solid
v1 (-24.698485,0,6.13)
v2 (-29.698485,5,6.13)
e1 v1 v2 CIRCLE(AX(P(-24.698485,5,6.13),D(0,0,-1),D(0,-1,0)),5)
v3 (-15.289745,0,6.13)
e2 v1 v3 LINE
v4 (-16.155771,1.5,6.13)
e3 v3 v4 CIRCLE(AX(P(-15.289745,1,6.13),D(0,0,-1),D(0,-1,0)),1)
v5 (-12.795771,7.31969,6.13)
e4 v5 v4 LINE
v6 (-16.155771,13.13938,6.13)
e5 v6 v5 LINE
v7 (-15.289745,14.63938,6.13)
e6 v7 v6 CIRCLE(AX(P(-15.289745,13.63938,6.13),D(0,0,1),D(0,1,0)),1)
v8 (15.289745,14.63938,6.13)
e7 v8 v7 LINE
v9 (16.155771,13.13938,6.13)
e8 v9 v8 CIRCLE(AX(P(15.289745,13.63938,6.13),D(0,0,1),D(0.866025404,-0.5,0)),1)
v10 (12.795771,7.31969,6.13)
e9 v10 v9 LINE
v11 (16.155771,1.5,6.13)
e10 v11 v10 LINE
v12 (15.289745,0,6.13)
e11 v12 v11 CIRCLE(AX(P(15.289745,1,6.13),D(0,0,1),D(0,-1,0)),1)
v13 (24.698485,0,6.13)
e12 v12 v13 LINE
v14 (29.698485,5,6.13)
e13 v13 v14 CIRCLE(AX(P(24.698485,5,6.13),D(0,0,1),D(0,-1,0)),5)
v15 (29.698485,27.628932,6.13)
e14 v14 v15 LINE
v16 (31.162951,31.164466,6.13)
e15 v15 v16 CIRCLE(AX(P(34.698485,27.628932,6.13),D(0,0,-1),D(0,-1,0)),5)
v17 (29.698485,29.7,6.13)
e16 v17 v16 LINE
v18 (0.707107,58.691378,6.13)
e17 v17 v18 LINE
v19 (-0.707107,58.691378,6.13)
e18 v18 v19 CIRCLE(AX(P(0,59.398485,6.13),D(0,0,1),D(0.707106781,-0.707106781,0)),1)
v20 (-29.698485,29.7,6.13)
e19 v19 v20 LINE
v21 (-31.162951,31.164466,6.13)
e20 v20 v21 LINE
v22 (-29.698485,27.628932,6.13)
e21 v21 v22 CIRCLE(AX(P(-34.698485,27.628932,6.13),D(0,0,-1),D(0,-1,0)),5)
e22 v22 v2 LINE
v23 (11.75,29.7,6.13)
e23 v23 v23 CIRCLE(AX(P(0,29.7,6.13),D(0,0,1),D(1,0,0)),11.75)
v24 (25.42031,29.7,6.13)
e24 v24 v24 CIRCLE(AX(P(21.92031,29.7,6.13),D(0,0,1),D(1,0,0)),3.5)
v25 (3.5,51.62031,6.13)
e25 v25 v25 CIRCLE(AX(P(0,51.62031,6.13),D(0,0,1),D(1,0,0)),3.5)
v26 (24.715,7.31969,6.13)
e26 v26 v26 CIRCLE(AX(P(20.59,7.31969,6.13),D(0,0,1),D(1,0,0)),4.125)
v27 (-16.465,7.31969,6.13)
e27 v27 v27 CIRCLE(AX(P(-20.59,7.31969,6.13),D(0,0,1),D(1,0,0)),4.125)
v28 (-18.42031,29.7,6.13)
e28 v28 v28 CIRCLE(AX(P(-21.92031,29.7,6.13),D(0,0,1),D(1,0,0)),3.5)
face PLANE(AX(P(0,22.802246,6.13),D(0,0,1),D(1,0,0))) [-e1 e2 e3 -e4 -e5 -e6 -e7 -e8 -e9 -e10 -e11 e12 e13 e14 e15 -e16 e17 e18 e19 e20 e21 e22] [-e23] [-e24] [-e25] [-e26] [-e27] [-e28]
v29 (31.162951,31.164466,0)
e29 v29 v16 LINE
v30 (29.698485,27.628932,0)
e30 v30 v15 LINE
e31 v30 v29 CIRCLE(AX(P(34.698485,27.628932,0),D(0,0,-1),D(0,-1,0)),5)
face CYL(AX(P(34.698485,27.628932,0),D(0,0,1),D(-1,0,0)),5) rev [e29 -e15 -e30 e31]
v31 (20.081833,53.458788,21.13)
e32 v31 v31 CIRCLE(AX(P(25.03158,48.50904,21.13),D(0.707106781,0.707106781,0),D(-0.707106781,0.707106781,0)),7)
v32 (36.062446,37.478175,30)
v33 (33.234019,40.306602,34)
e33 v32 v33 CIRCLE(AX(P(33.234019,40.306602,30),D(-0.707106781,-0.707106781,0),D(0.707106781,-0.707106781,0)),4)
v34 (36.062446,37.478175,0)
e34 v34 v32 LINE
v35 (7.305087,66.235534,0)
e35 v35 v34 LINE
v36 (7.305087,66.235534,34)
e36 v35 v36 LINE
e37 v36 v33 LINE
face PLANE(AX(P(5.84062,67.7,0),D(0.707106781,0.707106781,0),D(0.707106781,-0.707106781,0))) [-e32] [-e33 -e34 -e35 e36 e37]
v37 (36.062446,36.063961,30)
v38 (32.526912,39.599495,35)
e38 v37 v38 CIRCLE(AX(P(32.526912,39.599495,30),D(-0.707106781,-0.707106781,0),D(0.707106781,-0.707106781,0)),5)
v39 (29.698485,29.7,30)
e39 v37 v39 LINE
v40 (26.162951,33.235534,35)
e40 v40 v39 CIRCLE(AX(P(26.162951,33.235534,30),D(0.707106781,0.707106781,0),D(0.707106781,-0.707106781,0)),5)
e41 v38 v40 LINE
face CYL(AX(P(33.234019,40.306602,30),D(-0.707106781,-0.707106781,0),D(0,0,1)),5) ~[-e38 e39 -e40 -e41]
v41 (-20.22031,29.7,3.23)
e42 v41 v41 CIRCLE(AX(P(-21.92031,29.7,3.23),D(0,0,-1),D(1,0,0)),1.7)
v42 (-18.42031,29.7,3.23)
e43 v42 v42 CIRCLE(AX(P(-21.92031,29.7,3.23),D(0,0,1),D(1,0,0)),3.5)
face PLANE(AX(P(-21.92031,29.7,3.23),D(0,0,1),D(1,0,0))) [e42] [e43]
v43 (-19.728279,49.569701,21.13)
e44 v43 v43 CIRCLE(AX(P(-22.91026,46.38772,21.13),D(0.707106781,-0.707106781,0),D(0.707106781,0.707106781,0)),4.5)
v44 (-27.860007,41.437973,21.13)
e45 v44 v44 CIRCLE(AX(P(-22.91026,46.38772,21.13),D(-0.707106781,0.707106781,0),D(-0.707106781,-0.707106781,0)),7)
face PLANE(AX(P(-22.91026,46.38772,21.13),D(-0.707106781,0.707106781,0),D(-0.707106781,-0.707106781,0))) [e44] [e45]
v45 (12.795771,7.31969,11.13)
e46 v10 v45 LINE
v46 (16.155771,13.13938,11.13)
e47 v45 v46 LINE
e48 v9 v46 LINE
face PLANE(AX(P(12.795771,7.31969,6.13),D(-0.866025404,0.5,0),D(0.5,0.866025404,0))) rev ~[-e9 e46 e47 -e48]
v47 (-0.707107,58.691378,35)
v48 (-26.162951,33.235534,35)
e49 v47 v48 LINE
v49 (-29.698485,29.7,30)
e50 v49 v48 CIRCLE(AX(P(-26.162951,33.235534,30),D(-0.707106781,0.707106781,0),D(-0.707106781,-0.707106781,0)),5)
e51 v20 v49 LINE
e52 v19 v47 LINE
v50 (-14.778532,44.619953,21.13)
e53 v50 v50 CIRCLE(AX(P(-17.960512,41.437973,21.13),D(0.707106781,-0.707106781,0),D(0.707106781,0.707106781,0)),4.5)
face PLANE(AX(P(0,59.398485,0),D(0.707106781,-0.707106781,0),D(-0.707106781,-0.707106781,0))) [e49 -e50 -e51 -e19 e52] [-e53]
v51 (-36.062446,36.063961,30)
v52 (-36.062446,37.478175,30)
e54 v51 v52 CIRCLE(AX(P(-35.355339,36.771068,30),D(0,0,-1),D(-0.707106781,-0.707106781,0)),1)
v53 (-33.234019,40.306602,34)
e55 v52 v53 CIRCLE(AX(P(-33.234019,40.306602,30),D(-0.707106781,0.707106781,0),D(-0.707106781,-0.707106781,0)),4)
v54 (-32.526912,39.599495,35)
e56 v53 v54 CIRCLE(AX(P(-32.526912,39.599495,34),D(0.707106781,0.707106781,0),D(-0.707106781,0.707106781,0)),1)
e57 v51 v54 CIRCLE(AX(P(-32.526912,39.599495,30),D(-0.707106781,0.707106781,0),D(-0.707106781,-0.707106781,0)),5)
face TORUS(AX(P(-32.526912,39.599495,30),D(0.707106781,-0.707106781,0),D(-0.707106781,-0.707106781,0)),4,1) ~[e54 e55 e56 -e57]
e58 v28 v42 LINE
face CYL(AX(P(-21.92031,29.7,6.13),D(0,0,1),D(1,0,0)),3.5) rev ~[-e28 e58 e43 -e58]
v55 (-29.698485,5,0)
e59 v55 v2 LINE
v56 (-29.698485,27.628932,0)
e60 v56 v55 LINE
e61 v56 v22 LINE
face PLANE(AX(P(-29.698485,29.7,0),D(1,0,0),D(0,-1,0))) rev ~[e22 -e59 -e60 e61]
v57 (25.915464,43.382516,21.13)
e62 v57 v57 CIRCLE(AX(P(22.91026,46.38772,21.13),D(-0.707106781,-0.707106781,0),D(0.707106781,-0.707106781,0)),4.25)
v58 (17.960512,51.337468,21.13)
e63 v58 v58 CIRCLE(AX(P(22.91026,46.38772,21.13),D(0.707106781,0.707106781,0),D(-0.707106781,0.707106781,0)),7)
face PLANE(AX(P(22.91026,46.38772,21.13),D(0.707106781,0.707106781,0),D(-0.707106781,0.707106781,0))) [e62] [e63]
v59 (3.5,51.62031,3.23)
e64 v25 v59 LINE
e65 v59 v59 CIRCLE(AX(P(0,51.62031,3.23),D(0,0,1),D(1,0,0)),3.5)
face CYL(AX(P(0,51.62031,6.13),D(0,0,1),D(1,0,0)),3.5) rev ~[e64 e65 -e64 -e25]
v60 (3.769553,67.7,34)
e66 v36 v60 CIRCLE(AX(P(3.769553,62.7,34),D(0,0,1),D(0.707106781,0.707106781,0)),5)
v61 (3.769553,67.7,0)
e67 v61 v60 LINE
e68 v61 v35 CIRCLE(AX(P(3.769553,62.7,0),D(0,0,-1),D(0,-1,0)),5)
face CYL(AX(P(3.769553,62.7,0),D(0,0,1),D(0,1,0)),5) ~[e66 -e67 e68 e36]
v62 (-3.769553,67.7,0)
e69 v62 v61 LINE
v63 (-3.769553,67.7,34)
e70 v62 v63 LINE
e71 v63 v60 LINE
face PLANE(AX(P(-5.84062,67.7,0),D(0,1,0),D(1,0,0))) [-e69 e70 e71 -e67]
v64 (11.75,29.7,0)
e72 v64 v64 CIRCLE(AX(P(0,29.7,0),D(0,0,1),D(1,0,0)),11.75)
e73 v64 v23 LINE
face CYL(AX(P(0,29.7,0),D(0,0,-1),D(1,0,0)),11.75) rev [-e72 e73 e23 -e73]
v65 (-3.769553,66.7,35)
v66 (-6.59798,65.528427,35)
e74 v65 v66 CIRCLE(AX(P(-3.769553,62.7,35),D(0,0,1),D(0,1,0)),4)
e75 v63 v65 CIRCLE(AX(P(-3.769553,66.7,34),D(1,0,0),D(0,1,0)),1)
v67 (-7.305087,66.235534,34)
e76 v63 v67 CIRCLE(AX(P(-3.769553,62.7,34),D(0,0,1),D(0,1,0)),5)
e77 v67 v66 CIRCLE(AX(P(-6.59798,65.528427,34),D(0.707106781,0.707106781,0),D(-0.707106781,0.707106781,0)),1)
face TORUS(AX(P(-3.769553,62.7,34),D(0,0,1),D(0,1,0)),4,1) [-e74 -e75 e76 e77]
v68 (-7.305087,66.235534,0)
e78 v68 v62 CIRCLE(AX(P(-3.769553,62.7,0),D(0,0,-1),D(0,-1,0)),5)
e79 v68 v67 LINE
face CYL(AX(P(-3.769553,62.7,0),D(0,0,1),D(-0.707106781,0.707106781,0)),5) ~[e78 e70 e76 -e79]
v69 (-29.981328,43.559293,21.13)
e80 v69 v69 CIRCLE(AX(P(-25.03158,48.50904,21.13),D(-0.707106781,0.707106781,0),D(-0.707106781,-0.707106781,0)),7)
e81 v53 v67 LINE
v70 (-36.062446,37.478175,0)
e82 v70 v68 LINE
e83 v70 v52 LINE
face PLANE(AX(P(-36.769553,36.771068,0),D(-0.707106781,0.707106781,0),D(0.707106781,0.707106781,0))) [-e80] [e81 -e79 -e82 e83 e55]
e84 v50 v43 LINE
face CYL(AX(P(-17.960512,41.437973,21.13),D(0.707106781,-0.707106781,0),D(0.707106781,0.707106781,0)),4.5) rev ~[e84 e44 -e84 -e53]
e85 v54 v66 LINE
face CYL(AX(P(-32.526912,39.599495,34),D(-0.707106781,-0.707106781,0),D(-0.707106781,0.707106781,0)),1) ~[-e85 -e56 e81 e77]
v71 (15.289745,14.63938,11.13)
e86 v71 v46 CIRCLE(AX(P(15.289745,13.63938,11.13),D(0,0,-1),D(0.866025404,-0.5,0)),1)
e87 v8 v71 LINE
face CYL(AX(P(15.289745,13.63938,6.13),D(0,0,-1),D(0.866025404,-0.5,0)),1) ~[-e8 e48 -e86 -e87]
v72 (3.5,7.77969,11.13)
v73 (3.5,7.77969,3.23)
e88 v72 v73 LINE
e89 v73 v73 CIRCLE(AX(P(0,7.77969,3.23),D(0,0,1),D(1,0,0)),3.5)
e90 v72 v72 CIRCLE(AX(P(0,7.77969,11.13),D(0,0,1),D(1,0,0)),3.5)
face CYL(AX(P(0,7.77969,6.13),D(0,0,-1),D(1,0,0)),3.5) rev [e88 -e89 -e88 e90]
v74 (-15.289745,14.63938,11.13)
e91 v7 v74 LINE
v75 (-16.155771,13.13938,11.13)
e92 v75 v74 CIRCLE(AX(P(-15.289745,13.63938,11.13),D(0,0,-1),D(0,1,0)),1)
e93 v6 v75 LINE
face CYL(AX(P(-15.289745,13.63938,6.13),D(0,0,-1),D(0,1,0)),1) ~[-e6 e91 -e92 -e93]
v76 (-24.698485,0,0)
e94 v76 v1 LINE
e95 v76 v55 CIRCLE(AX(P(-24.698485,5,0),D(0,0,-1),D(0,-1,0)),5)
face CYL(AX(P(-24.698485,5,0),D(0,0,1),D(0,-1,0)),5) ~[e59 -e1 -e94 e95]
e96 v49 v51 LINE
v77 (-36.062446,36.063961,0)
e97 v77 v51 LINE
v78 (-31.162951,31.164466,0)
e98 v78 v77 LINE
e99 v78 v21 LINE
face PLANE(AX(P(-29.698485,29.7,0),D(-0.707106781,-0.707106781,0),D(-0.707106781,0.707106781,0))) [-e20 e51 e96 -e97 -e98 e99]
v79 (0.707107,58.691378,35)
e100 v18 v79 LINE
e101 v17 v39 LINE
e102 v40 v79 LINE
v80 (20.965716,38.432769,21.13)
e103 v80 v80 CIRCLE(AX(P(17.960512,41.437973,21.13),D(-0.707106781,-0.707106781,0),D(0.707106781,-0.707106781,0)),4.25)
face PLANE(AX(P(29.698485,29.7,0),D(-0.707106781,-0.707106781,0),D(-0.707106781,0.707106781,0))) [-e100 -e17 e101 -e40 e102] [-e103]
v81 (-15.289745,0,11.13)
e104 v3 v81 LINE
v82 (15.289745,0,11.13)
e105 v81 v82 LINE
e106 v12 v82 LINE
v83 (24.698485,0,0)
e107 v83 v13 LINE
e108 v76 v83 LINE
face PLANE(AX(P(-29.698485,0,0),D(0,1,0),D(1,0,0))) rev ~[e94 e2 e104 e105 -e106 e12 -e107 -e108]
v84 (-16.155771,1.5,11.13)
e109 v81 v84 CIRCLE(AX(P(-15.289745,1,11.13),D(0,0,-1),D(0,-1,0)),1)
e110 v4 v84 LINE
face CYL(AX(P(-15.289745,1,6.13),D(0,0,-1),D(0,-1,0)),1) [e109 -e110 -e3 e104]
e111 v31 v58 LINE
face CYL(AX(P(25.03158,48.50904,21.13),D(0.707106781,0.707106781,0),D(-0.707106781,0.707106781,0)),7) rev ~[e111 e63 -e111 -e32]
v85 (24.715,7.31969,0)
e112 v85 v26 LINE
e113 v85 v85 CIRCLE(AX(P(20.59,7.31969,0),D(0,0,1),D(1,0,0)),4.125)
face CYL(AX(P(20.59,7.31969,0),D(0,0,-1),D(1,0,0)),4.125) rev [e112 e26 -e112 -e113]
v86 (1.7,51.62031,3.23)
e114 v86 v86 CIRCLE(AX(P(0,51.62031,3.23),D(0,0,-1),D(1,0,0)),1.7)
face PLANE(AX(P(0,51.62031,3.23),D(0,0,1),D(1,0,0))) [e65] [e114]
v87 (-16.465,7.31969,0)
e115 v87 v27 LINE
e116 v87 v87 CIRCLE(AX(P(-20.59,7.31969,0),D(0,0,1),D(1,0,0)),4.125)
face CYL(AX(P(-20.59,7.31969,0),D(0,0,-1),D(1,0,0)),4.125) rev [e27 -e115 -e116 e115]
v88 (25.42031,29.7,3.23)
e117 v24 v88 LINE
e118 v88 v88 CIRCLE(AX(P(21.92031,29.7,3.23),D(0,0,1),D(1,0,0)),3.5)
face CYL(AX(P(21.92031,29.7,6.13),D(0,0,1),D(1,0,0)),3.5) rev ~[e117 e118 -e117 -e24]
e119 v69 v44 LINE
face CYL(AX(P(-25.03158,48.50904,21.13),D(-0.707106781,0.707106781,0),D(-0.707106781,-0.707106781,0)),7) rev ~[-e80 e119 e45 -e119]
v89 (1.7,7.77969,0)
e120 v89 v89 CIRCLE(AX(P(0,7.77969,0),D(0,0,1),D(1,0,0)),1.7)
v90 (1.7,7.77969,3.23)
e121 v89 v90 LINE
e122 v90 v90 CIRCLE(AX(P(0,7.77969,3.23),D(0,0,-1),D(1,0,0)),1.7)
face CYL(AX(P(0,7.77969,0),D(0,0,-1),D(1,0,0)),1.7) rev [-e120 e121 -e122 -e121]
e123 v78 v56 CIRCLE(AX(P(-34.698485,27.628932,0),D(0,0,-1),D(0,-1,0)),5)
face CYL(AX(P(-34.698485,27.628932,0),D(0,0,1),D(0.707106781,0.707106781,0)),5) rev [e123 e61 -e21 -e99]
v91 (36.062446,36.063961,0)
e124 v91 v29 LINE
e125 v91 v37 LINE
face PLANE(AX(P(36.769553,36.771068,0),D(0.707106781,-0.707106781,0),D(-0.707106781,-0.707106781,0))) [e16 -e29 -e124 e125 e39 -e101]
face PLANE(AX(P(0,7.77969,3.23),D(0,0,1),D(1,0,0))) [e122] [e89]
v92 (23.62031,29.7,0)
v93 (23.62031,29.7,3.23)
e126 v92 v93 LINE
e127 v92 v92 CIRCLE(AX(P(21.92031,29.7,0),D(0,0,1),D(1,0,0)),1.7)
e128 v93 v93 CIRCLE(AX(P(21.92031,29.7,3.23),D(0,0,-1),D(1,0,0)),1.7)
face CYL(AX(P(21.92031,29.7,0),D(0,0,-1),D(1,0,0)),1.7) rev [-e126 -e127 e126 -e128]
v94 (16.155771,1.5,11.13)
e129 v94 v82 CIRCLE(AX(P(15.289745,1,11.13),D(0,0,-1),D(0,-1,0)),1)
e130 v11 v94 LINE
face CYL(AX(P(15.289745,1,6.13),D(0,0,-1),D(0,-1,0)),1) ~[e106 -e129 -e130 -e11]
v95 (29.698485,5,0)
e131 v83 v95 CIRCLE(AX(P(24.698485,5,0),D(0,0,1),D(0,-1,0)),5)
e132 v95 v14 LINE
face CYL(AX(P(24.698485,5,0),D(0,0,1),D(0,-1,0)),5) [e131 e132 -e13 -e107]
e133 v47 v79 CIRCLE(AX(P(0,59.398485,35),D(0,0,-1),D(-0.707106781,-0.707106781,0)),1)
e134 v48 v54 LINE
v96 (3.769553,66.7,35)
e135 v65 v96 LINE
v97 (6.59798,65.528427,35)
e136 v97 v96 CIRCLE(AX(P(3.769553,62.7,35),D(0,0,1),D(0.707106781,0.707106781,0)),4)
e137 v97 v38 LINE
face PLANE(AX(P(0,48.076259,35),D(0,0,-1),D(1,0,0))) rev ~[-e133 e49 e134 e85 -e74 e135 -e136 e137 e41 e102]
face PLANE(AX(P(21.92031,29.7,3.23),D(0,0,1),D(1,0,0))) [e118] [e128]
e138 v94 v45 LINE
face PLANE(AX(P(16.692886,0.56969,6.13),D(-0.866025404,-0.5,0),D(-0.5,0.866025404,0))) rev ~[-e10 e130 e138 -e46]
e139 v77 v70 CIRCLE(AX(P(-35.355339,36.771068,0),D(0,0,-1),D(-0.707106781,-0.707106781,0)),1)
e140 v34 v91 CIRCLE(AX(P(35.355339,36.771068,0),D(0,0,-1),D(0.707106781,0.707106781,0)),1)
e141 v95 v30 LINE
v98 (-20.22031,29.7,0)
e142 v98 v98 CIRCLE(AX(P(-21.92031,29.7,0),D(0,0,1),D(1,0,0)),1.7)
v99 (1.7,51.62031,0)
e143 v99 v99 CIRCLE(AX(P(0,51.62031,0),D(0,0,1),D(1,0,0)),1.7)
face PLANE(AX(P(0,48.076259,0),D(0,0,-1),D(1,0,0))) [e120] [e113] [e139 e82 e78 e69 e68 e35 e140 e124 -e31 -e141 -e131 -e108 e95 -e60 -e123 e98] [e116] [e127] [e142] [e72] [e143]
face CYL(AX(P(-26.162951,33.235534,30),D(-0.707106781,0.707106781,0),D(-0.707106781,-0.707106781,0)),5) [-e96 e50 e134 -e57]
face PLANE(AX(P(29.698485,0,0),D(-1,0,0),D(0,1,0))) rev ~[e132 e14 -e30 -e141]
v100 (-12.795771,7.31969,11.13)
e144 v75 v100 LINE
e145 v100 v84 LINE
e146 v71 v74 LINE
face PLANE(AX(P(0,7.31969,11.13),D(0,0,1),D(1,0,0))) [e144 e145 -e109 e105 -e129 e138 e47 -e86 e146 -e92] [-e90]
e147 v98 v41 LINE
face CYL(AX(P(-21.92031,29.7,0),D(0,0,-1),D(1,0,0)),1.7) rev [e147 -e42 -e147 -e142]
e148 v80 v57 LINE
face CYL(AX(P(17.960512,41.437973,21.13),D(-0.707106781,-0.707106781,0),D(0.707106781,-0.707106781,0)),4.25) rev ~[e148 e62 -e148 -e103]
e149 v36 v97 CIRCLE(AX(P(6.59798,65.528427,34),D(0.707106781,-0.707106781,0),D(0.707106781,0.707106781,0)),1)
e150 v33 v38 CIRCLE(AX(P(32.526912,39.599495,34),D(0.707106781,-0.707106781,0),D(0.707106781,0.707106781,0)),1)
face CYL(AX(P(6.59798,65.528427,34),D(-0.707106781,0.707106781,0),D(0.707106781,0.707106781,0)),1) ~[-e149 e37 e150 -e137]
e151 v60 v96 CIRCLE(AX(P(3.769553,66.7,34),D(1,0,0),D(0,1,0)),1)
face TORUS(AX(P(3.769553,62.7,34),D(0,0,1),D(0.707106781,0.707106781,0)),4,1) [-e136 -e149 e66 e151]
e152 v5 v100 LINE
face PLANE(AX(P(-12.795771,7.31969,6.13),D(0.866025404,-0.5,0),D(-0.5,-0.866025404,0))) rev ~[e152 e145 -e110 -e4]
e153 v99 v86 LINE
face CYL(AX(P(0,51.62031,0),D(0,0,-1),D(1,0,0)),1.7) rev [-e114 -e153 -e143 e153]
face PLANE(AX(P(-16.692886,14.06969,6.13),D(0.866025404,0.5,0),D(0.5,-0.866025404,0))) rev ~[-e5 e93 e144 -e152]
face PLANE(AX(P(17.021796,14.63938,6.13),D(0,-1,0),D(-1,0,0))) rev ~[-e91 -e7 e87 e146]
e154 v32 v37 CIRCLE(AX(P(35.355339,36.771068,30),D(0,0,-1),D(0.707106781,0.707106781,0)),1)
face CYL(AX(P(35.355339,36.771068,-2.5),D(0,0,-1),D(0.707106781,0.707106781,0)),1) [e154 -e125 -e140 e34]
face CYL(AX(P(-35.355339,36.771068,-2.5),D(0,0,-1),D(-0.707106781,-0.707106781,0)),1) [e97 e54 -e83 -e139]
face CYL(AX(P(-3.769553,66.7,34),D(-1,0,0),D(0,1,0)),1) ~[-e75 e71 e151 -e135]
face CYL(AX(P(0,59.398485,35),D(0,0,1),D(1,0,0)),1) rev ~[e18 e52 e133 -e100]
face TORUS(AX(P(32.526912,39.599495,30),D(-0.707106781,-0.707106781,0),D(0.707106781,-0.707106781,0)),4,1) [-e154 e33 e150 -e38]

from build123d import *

# Parameters (mm, degrees)
F0_R          = 4.125
F0_R_2        = 1.7
F0_R_3        = 11.75
F1_DEPTH      = 6.13
F3_DEPTH      = 35
F4_R          = 4.5
F5_DEPTH      = 10
F6_R          = 4.25
F7_DEPTH      = 10
F8_R          = 7
F9_DEPTH      = 3
F10_R         = 7
F11_DEPTH     = 3
F13_R         = 5
F12_R         = 3.5
F14_DEPTH     = 2.9
F15_R         = 3.5
F16_DEPTH     = 5
F17_T1_DEPTH  = 32.5
F17_T3_DEPTH  = 9.3301270189
F17_T5_DEPTH  = 36.6690475583
F17_T7_DEPTH  = 7.5391052434
F17_T9_DEPTH  = 36.6690475583
F17_T12_ANGLE = 90
F17_T14_ANGLE = 45
F17_T16_ANGLE = 45
F17_T18_ANGLE = 90
F18_R         = 1
F19_DEPTH     = 28.87


# Not quite as in the source:
# - a fillet or chamfer that OpenCascade refuses, or shapes differently, is made with other operations: its cross-section is extruded or revolved along the edge and cut away or added


with BuildPart() as f1:
    # F0 (on Top) → F1 (new body)
    with BuildSketch(Plane.XY):
        Polygon((-29.6984848098, 0), (0, 0), (29.6984848098, 0), (29.6984848098, 29.7), (0, 59.3984848098), (-29.6984848098, 29.7), align=None)
        with Locations((-20.59, 7.3196897832)):
            Circle(F0_R, mode=Mode.SUBTRACT)
        with Locations((0, 7.7796897832)):
            Circle(F0_R_2, mode=Mode.SUBTRACT)
        with Locations((20.59, 7.3196897832)):
            Circle(F0_R, mode=Mode.SUBTRACT)
        with Locations((-21.9203102168, 29.7)):
            Circle(F0_R_2, mode=Mode.SUBTRACT)
        with Locations((0, 29.7)):
            Circle(F0_R_3, mode=Mode.SUBTRACT)
        with Locations((21.9203102168, 29.7)):
            Circle(F0_R_2, mode=Mode.SUBTRACT)
        with Locations((0, 51.6203102168)):
            Circle(F0_R_2, mode=Mode.SUBTRACT)
    extrude(amount=F1_DEPTH)

    # F2 (on face) → F3 (join)
    with BuildSketch(Plane(origin=(0, 0, 0), x_dir=(1, 0, 0), z_dir=(0, 0, -1))):
        Polygon((0, -59.3984848098), (-29.6984848098, -29.7), (-36.7695526217, -36.7710678119), (-5.8406204336, -67.7), (0, -67.7), (5.8406204336, -67.7), (36.7695526217, -36.7710678119), (29.6984848098, -29.7), align=None)
    extrude(amount=-F3_DEPTH)

    # F4 (on face) → F5 (cut, through all)
    with BuildSketch(Plane(origin=(-29.6992424049, 29.6992424049, 0), x_dir=(0.7071067812, 0.7071067812, 0), z_dir=(0.7071067812, -0.7071067812, 0))):
        with Locations((16.6010714012, 21.13)):
            Circle(F4_R)
    extrude(amount=-F5_DEPTH, mode=Mode.SUBTRACT)

    # F6 (on face) → F7 (cut, through all)
    with BuildSketch(Plane(origin=(29.6992424049, 29.6992424049, 0), x_dir=(0.7071067812, -0.7071067812, 0), z_dir=(-0.7071067812, -0.7071067812, 0))):
        with Locations((-16.6010714012, 21.13)):
            Circle(F6_R)
    extrude(amount=-F7_DEPTH, mode=Mode.SUBTRACT)

    # F8 (on face) → F9 (cut)
    with BuildSketch(Plane(origin=(-36.7703102168, 36.7703102168, 0), x_dir=(-0.7071067812, -0.7071067812, 0), z_dir=(-0.7071067812, 0.7071067812, 0))):
        with Locations((-16.6010714006, 21.13)):
            Circle(F8_R)
    extrude(amount=-F9_DEPTH, mode=Mode.SUBTRACT)

    # F10 (on face) → F11 (cut)
    with BuildSketch(Plane(origin=(36.7703102168, 36.7703102168, 0), x_dir=(-0.7071067812, 0.7071067812, 0), z_dir=(0.7071067812, 0.7071067812, 0))):
        with Locations((16.6010714007, 21.13)):
            Circle(F10_R)
    extrude(amount=-F11_DEPTH, mode=Mode.SUBTRACT)

    # F13
    f13_edges = [f1.edges().sort_by_distance(p)[0] for p in [
        (33.234019, 33.235534, 35),
        (-33.234019, 33.235534, 35),
        (29.698485, 29.7, 3.065),
        (29.698485, 0, 3.065),
        (-29.698485, 0, 3.065),
        (-29.698485, 29.7, 3.065),
        (-5.84062, 67.7, 17.5),
        (5.84062, 67.7, 17.5),
    ]]
    fillet(f13_edges, radius=F13_R)

    # F12 (on face) → F14 (cut)
    with BuildSketch(Plane.XY.offset(6.13)):
        with Locations((0, 51.6203102168)):
            Circle(F12_R)
        with Locations((-21.9203102168, 29.7)):
            Circle(F12_R)
        with Locations((21.9203102168, 29.7)):
            Circle(F12_R)
        with Locations((0, 7.7796897832)):
            Circle(F12_R)
    extrude(amount=-F14_DEPTH, mode=Mode.SUBTRACT)

    # F15 (on face) → F16 (join)
    with BuildSketch(Plane.XY.offset(6.13)):
        Polygon((16.692885683, 14.0696897832), (-16.692885683, 14.0696897832), (-12.7957713659, 7.3196897832), (-16.692885683, 0.5696897832), (16.692885683, 0.5696897832), (12.7957713659, 7.3196897832), align=None)
        with Locations((0, 7.7796897832)):
            Circle(F15_R, mode=Mode.SUBTRACT)
        Polygon((16.692885683, 0.5696897832), (-16.692885683, 0.5696897832), (-17.0217962327, 0), (0, 0), (17.0217962327, 0), align=None)
        Polygon((-17.0217962327, 14.6393795664), (-16.692885683, 14.0696897832), (16.692885683, 14.0696897832), (17.0217962327, 14.6393795664), (0, 14.6393795664), align=None)
    extrude(amount=F16_DEPTH)

    # F17: fillet of radius 1 on 13 edges, made by hand

    # F17_s2 → F17_t1 (cut)
    with BuildSketch(Plane.XY.offset(-2.5)):
        with BuildLine():
            ThreePointArc((36.0624458405, 37.4781745931), (36.3553390593, 36.7710678119), (36.0624458405, 36.0639610307))
            Line((36.0624458405, 36.0639610307), (36.7695526217, 36.7710678119))
            Line((36.7695526217, 36.7710678119), (36.0624458405, 37.4781745931))
        make_face()
        with BuildLine():
            ThreePointArc((-36.0624458405, 36.0639610307), (-36.3553390593, 36.7710678119), (-36.0624458405, 37.4781745931))
            Line((-36.0624458405, 37.4781745931), (-36.7695526217, 36.7710678119))
            Line((-36.7695526217, 36.7710678119), (-36.0624458405, 36.0639610307))
        make_face()
    extrude(amount=F17_T1_DEPTH, mode=Mode.SUBTRACT)

    # F17_s4 → F17_t3 (cut)
    with BuildSketch(Plane.XY.offset(6.13)):
        with BuildLine():
            ThreePointArc((-15.2897454251, 0), (-16.1557708289, 0.5), (-16.1557708289, 1.5))
            Line((-16.1557708289, 1.5), (-17.0217962327, 0))
            Line((-17.0217962327, 0), (-15.2897454251, 0))
        make_face()
        with BuildLine():
            ThreePointArc((-15.2897454251, 14.6393795664), (-16.1557708289, 14.1393795664), (-16.1557708289, 13.1393795664))
            Line((-16.1557708289, 13.1393795664), (-17.0217962327, 14.6393795664))
            Line((-17.0217962327, 14.6393795664), (-15.2897454251, 14.6393795664))
        make_face()
        with BuildLine():
            ThreePointArc((16.1557708289, 13.1393795664), (16.1557708289, 14.1393795664), (15.2897454251, 14.6393795664))
            Line((15.2897454251, 14.6393795664), (17.0217962327, 14.6393795664))
            Line((17.0217962327, 14.6393795664), (16.1557708289, 13.1393795664))
        make_face()
        with BuildLine():
            ThreePointArc((15.2897454251, 0), (16.1557708289, 0.5), (16.1557708289, 1.5))
            Line((16.1557708289, 1.5), (17.0217962327, 0))
            Line((17.0217962327, 0), (15.2897454251, 0))
        make_face()
    extrude(amount=F17_T3_DEPTH, mode=Mode.SUBTRACT)

    # F17_s6 → F17_t5 (cut)
    with BuildSketch(Plane(origin=(3.536291501, 3.536291501, 0), x_dir=(0, 0, 1), z_dir=(0.7071067812, 0.7071067812, 0))):
        with BuildLine():
            ThreePointArc((34, -52.0010714012), (34.7071067812, -51.7081781824), (35, -51.0010714012))
            Line((35, -51.0010714012), (35, -52.0010714012))
            Line((35, -52.0010714012), (34, -52.0010714012))
        make_face()
    extrude(amount=F17_T5_DEPTH, mode=Mode.SUBTRACT)

    # F17_s8 → F17_t7 (cut)
    with BuildSketch(Plane.YZ.offset(-3.7695526217)):
        with BuildLine():
            ThreePointArc((67.7, 34), (67.4071067812, 34.7071067812), (66.7, 35))
            Line((66.7, 35), (67.7, 35))
            Line((67.7, 35), (67.7, 34))
        make_face()
    extrude(amount=F17_T7_DEPTH, mode=Mode.SUBTRACT)

    # F17_s10 → F17_t9 (cut)
    with BuildSketch(Plane(origin=(-29.4652236891, 29.4652236891, 0), x_dir=(0, 0, 1), z_dir=(0.7071067812, -0.7071067812, 0))):
        with BuildLine():
            ThreePointArc((34, -52.0010714012), (34.7071067812, -51.7081781824), (35, -51.0010714012))
            Line((35, -51.0010714012), (35, -52.0010714012))
            Line((35, -52.0010714012), (34, -52.0010714012))
        make_face()
    extrude(amount=F17_T9_DEPTH, mode=Mode.SUBTRACT)

    # F17_s11 → F17_t12 (revolve, cut)
    with BuildSketch(Plane.XY.offset(30)):
        with BuildLine():
            ThreePointArc((-36.0624458405, 37.4781745931), (-36.3553390593, 36.7710678119), (-36.0624458405, 36.0639610307))
            Line((-36.0624458405, 36.0639610307), (-36.7695526217, 36.7710678119))
            Line((-36.7695526217, 36.7710678119), (-36.0624458405, 37.4781745931))
        make_face()
    revolve(axis=Axis((-33.2340187158, 40.3066017178, 30), (-0.7071067812, 0.7071067812, 0)), revolution_arc=F17_T12_ANGLE, mode=Mode.SUBTRACT)

    # F17_s13 → F17_t14 (revolve, cut)
    with BuildSketch(Plane.YZ.offset(-3.7695526217)):
        with BuildLine():
            ThreePointArc((67.7, 34), (67.4071067812, 34.7071067812), (66.7, 35))
            Line((66.7, 35), (67.7, 35))
            Line((67.7, 35), (67.7, 34))
        make_face()
    revolve(axis=Axis((-3.7695526217, 62.7, 35), (0, 0, 1)), revolution_arc=F17_T14_ANGLE, mode=Mode.SUBTRACT)

    # F17_s15 → F17_t16 (revolve, cut)
    with BuildSketch(Plane(origin=(-29.4652236891, 29.4652236891, 0), x_dir=(0, 0, 1), z_dir=(0.7071067812, -0.7071067812, 0))):
        with BuildLine():
            ThreePointArc((34, -52.0010714012), (34.7071067812, -51.7081781824), (35, -51.0010714012))
            Line((35, -51.0010714012), (35, -52.0010714012))
            Line((35, -52.0010714012), (34, -52.0010714012))
        make_face()
    revolve(axis=Axis((3.7695526217, 62.7, 35), (0, 0, 1)), revolution_arc=F17_T16_ANGLE, mode=Mode.SUBTRACT)

    # F17_s17 → F17_t18 (revolve, cut)
    with BuildSketch(Plane.XY.offset(30)):
        with BuildLine():
            ThreePointArc((36.0624458405, 37.4781745931), (36.3553390593, 36.7710678119), (36.0624458405, 36.0639610307))
            Line((36.0624458405, 36.0639610307), (36.7695526217, 36.7710678119))
            Line((36.7695526217, 36.7710678119), (36.0624458405, 37.4781745931))
        make_face()
    revolve(axis=Axis((33.2340187158, 40.3066017178, 30), (-0.7071067812, -0.7071067812, 0)), revolution_arc=F17_T18_ANGLE, mode=Mode.SUBTRACT)

    # F18 (on face) → F19 (cut, through all)
    with BuildSketch(Plane.XY.offset(35)):
        with Locations((0, 59.3984848098)):
            Circle(F18_R)
    extrude(amount=-F19_DEPTH, mode=Mode.SUBTRACT)


solid = f1.part
